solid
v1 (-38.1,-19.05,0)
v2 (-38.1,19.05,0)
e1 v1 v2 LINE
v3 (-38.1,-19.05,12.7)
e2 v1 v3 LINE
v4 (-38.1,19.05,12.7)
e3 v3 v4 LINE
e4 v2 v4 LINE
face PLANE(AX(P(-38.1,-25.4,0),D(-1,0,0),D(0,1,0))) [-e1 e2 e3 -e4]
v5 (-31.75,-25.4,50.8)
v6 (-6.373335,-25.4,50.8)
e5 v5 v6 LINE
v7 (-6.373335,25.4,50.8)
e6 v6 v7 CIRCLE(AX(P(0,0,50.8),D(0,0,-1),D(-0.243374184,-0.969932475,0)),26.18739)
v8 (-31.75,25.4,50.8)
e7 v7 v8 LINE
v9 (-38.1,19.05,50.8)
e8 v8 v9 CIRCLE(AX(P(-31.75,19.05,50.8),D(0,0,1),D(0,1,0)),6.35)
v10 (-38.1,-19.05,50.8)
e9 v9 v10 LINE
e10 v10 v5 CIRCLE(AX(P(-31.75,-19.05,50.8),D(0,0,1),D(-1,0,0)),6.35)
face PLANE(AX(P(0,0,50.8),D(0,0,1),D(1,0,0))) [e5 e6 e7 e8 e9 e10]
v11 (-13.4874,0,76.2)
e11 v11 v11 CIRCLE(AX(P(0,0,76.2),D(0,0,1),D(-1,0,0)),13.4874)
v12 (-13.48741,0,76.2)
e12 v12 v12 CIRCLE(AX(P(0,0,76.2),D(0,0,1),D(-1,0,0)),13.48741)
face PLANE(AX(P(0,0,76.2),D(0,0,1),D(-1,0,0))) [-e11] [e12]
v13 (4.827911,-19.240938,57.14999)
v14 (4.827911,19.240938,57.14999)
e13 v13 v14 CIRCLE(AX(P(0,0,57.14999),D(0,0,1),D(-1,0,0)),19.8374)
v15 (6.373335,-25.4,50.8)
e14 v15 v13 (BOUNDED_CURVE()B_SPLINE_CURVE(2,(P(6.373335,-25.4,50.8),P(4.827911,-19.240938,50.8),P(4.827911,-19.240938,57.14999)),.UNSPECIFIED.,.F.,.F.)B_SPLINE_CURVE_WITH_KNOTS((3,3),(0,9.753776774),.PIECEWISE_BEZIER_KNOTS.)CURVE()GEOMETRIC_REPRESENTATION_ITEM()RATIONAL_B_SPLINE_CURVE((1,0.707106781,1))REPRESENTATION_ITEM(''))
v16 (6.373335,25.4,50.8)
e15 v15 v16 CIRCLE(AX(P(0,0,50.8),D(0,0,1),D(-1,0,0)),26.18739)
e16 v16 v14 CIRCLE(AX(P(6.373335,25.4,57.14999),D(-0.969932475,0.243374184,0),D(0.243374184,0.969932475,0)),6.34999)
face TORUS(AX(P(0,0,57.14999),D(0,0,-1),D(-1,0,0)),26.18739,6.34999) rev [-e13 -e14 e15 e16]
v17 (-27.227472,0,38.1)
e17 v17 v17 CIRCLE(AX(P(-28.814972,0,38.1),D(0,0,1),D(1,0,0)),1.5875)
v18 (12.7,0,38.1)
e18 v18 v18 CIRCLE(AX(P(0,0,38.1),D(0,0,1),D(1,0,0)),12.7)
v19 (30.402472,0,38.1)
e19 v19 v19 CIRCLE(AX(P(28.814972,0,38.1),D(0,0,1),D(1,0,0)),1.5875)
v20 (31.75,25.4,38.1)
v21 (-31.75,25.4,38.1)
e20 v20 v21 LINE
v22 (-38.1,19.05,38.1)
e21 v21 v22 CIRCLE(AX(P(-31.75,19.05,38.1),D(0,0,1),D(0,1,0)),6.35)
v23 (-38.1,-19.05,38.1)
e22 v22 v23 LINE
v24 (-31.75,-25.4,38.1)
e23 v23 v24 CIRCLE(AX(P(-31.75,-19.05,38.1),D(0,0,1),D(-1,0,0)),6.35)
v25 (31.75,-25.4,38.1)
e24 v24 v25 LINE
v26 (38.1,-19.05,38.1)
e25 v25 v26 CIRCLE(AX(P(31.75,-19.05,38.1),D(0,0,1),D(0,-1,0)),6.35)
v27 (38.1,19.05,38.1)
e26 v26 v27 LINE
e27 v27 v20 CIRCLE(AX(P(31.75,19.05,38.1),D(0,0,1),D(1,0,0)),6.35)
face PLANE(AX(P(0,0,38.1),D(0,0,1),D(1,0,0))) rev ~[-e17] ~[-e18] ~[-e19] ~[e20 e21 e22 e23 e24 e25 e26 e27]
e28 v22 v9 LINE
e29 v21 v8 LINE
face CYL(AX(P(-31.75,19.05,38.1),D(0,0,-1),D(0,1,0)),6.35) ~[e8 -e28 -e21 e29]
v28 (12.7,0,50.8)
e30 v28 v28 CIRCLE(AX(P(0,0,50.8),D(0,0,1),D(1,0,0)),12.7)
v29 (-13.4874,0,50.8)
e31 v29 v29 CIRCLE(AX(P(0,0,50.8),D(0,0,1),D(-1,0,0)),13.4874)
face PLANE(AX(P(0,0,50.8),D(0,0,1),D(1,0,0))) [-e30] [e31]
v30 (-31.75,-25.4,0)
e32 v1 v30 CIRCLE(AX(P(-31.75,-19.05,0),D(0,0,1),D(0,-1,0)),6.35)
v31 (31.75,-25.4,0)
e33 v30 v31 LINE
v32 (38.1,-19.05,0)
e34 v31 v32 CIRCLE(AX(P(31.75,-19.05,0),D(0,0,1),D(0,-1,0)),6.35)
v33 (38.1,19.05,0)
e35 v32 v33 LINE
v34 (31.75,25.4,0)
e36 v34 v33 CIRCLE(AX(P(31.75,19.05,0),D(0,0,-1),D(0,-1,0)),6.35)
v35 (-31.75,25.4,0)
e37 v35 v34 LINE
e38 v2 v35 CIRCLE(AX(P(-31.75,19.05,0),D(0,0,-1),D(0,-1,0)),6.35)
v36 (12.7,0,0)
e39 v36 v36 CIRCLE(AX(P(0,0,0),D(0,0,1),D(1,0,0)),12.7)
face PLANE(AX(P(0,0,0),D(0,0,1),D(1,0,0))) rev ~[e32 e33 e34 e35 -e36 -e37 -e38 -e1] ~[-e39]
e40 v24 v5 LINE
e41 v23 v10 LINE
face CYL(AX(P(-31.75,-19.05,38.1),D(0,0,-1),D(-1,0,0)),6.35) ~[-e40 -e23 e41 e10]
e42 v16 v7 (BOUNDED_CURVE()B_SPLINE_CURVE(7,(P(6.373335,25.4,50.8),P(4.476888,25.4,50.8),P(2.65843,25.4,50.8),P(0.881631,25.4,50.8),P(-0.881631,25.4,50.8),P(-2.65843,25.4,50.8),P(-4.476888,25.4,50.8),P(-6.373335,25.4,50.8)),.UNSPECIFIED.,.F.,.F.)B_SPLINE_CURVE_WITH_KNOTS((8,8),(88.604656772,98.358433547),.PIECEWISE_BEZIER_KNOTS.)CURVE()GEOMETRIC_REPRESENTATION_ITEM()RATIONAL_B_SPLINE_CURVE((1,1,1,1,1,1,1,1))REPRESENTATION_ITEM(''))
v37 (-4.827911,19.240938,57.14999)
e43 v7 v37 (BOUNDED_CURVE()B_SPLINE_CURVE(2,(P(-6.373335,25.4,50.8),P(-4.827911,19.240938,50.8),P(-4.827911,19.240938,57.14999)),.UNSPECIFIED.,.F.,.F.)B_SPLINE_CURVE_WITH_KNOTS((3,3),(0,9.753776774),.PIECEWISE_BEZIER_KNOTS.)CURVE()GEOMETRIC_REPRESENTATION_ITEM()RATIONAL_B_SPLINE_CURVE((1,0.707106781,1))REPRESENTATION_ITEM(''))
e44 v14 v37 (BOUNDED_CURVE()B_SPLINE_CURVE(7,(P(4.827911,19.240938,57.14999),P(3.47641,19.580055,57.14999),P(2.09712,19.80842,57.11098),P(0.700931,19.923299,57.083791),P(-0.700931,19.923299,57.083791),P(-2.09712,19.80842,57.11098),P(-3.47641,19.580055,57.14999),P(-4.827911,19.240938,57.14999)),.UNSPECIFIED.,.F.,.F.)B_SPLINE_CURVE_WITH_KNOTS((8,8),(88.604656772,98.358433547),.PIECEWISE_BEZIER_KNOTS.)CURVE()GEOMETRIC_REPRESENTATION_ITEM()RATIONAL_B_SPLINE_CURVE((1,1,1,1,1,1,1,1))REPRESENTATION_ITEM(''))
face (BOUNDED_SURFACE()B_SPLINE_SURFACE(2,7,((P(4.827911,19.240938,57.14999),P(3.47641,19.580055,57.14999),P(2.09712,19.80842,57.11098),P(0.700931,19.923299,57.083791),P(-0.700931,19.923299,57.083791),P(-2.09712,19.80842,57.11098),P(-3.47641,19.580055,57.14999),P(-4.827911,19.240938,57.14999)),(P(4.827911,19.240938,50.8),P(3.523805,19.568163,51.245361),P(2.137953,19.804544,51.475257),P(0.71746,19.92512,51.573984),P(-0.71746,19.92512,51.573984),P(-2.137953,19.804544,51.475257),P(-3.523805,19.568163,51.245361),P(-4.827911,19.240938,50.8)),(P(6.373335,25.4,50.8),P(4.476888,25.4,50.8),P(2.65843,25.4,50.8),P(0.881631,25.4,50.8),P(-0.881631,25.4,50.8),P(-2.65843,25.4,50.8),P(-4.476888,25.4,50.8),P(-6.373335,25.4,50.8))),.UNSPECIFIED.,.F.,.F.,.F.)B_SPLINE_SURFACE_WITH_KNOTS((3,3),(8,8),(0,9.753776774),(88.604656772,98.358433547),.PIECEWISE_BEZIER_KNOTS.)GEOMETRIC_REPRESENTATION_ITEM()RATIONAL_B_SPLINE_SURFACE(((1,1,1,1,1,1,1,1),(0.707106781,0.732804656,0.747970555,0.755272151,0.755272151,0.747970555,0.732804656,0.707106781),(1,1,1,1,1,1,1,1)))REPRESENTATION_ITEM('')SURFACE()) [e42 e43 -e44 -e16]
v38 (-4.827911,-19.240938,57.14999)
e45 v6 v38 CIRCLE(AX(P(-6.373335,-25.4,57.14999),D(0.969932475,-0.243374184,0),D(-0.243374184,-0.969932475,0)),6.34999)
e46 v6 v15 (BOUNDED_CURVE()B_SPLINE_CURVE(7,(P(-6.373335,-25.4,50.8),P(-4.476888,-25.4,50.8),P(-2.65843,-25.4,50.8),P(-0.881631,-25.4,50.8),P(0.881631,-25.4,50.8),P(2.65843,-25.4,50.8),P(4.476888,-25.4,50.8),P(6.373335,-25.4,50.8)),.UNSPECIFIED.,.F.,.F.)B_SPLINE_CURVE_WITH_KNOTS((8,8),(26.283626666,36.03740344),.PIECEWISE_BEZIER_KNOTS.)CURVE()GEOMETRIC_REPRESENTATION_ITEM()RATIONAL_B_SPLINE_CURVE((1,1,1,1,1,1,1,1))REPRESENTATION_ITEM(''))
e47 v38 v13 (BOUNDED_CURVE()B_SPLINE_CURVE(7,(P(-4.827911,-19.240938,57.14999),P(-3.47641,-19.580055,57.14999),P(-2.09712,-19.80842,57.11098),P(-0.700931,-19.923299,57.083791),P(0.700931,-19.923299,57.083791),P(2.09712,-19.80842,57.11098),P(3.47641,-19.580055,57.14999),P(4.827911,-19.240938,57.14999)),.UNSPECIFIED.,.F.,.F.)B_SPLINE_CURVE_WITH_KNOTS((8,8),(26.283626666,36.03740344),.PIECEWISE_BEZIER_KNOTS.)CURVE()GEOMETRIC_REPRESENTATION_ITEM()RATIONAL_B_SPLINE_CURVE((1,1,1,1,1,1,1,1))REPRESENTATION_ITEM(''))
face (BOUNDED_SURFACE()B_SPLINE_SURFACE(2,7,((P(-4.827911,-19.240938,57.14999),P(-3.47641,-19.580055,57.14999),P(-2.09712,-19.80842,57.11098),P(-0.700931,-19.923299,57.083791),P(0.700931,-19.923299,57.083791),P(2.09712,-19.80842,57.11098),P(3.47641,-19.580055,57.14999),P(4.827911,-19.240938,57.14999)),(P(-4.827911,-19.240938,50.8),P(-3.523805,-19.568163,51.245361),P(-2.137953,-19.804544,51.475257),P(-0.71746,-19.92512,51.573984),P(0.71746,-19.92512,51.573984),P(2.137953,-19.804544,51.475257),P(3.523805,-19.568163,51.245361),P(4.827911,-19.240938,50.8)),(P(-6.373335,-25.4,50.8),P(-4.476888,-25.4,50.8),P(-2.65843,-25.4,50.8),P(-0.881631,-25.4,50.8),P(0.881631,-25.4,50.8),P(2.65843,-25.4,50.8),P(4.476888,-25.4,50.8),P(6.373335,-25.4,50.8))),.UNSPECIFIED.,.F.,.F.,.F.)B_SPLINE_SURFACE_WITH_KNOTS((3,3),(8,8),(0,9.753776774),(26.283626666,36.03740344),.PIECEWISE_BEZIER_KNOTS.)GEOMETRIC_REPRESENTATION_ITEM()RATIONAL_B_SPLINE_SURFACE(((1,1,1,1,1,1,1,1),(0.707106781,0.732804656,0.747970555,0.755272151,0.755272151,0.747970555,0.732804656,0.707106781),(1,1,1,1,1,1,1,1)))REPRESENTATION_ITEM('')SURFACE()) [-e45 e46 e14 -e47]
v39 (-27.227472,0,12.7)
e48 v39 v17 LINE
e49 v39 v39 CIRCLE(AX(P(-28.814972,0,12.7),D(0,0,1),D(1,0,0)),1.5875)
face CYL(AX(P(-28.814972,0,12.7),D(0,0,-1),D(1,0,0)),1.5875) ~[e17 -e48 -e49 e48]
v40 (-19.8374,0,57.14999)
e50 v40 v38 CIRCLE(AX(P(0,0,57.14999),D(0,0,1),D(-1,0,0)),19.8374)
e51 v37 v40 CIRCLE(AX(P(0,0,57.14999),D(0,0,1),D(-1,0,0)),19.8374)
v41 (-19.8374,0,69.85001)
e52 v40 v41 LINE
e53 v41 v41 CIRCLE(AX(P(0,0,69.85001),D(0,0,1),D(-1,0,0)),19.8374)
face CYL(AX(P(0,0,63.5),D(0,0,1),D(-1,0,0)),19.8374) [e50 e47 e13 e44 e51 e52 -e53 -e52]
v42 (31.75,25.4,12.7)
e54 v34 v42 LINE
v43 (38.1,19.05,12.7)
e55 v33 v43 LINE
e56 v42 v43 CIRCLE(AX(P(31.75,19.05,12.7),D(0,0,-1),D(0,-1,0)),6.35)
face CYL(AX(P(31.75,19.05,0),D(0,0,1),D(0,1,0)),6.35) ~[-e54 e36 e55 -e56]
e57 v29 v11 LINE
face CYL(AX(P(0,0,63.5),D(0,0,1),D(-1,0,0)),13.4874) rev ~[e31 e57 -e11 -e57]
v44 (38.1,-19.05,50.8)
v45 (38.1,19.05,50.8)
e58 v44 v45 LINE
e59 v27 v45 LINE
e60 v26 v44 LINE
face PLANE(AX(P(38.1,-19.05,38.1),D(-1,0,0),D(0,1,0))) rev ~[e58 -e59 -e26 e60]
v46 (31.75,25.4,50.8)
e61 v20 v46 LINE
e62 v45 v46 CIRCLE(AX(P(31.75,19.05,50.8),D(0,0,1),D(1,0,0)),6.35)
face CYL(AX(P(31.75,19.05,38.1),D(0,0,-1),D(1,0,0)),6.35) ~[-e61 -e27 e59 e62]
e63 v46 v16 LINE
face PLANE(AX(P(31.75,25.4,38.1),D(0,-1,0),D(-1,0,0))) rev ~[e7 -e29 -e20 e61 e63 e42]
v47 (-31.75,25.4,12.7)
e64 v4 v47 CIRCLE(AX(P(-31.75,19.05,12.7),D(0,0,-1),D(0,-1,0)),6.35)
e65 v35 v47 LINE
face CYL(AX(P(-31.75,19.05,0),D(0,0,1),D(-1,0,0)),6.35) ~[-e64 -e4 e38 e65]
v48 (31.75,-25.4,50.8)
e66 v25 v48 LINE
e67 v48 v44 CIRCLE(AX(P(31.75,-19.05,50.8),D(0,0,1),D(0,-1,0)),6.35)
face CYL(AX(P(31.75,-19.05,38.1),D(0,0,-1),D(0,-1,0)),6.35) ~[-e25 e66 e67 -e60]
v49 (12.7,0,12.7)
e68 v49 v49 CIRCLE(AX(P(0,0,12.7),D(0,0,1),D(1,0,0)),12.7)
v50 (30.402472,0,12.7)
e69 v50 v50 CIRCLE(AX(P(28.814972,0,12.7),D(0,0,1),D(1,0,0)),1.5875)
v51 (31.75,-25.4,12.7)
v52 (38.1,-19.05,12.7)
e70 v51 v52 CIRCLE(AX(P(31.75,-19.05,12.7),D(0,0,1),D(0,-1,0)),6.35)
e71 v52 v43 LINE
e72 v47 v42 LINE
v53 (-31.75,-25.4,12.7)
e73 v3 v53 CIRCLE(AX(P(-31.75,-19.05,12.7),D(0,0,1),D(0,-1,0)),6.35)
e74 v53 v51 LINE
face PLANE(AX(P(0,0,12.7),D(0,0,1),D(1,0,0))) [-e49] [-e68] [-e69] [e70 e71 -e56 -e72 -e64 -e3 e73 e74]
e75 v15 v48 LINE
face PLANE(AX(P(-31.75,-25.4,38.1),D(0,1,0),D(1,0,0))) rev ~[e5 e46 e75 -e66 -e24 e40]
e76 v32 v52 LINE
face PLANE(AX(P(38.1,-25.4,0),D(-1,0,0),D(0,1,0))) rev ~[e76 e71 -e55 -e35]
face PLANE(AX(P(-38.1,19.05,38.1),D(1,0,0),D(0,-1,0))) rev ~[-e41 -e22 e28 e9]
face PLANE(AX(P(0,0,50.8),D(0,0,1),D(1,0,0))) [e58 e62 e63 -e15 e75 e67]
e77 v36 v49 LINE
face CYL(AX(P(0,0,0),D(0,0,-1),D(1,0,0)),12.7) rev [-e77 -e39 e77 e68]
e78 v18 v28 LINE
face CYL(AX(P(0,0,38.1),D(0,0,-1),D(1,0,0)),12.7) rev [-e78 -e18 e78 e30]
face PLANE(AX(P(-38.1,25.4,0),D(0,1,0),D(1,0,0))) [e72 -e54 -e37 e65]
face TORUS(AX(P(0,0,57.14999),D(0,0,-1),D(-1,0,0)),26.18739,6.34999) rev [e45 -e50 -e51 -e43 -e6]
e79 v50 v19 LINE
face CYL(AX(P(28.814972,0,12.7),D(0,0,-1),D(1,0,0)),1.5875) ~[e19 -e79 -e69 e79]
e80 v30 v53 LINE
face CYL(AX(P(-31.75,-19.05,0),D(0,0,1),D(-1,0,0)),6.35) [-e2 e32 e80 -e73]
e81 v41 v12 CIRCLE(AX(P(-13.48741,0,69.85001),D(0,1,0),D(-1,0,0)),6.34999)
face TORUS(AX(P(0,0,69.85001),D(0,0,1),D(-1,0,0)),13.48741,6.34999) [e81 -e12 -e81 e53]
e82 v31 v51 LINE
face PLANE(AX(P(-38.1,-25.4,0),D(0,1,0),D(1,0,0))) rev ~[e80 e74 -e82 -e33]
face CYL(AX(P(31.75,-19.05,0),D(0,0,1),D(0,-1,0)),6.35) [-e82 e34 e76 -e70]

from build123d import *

# Parameters (mm, degrees)
F0_W     = 76.2
F0_H     = 50.8
F0_R     = 12.7
F1_DEPTH = 12.7
F2_R     = 6.35
F3_R     = 1.5875
F4_DEPTH = 25.4
F5_R     = 12.7
F6_DEPTH = 12.7
F7_W     = 6.35
F7_H     = 25.4
F9_R     = 6.34999


# Not quite as in the source:
# - a fillet or chamfer is up to 0.001 mm smaller than in the source, because OpenCascade refuses the exact size


with BuildPart() as f1:
    # F0 (on Top) → F1 (new body)
    with BuildSketch(Plane.XY):
        Rectangle(F0_W, F0_H)
        Circle(F0_R, mode=Mode.SUBTRACT)
    extrude(amount=F1_DEPTH)

    # F2
    f2_edges = [f1.edges().sort_by_distance(p)[0] for p in [
        (38.1, -25.4, 6.35),
        (38.1, 25.4, 6.35),
        (-38.1, -25.4, 6.35),
        (-38.1, 25.4, 6.35),
    ]]
    fillet(f2_edges, radius=F2_R)

    # F3 (on face) → F4 (join)
    with BuildSketch(Plane.XY.offset(12.7)):
        with Locations((-28.8149718722, 0)):
            Circle(F3_R)
        with Locations((28.8149718722, 0)):
            Circle(F3_R)
    extrude(amount=F4_DEPTH)

    # F5 (on face) → F6 (join)
    with BuildSketch(Plane.XY.offset(38.1)):
        with BuildLine():
            Line((-38.1, 19.05), (-38.1, -19.05))
            ThreePointArc((-38.1, -19.05), (-36.2401280605, -23.5401280605), (-31.75, -25.4))
            Line((-31.75, -25.4), (31.75, -25.4))
            ThreePointArc((31.75, -25.4), (36.2401280605, -23.5401280605), (38.1, -19.05))
            Line((38.1, -19.05), (38.1, 19.05))
            ThreePointArc((38.1, 19.05), (36.2401280605, 23.5401280605), (31.75, 25.4))
            Line((31.75, 25.4), (-31.75, 25.4))
            ThreePointArc((-31.75, 25.4), (-36.2401280605, 23.5401280605), (-38.1, 19.05))
        make_face()
        Circle(F5_R, mode=Mode.SUBTRACT)
    extrude(amount=F6_DEPTH)

    # F7 (on Front) → F8 (revolve)
    with BuildSketch(Plane.XZ):
        with Locations((-16.6624, 63.5)):
            Rectangle(F7_W, F7_H)
    revolve(axis=Axis((0, 0, 40.5965745449), (0, 0, 1)))

    # F9 (radius 6.35 in the source; OpenCascade refuses exactly that, so slightly less here)
    f9_edges = [f1.edges().sort_by_distance(p)[0] for p in [
        (19.8374, 0, 76.2),
        (19.8374, 0, 50.8),
    ]]
    fillet(f9_edges, radius=F9_R)


solid = f1.part
